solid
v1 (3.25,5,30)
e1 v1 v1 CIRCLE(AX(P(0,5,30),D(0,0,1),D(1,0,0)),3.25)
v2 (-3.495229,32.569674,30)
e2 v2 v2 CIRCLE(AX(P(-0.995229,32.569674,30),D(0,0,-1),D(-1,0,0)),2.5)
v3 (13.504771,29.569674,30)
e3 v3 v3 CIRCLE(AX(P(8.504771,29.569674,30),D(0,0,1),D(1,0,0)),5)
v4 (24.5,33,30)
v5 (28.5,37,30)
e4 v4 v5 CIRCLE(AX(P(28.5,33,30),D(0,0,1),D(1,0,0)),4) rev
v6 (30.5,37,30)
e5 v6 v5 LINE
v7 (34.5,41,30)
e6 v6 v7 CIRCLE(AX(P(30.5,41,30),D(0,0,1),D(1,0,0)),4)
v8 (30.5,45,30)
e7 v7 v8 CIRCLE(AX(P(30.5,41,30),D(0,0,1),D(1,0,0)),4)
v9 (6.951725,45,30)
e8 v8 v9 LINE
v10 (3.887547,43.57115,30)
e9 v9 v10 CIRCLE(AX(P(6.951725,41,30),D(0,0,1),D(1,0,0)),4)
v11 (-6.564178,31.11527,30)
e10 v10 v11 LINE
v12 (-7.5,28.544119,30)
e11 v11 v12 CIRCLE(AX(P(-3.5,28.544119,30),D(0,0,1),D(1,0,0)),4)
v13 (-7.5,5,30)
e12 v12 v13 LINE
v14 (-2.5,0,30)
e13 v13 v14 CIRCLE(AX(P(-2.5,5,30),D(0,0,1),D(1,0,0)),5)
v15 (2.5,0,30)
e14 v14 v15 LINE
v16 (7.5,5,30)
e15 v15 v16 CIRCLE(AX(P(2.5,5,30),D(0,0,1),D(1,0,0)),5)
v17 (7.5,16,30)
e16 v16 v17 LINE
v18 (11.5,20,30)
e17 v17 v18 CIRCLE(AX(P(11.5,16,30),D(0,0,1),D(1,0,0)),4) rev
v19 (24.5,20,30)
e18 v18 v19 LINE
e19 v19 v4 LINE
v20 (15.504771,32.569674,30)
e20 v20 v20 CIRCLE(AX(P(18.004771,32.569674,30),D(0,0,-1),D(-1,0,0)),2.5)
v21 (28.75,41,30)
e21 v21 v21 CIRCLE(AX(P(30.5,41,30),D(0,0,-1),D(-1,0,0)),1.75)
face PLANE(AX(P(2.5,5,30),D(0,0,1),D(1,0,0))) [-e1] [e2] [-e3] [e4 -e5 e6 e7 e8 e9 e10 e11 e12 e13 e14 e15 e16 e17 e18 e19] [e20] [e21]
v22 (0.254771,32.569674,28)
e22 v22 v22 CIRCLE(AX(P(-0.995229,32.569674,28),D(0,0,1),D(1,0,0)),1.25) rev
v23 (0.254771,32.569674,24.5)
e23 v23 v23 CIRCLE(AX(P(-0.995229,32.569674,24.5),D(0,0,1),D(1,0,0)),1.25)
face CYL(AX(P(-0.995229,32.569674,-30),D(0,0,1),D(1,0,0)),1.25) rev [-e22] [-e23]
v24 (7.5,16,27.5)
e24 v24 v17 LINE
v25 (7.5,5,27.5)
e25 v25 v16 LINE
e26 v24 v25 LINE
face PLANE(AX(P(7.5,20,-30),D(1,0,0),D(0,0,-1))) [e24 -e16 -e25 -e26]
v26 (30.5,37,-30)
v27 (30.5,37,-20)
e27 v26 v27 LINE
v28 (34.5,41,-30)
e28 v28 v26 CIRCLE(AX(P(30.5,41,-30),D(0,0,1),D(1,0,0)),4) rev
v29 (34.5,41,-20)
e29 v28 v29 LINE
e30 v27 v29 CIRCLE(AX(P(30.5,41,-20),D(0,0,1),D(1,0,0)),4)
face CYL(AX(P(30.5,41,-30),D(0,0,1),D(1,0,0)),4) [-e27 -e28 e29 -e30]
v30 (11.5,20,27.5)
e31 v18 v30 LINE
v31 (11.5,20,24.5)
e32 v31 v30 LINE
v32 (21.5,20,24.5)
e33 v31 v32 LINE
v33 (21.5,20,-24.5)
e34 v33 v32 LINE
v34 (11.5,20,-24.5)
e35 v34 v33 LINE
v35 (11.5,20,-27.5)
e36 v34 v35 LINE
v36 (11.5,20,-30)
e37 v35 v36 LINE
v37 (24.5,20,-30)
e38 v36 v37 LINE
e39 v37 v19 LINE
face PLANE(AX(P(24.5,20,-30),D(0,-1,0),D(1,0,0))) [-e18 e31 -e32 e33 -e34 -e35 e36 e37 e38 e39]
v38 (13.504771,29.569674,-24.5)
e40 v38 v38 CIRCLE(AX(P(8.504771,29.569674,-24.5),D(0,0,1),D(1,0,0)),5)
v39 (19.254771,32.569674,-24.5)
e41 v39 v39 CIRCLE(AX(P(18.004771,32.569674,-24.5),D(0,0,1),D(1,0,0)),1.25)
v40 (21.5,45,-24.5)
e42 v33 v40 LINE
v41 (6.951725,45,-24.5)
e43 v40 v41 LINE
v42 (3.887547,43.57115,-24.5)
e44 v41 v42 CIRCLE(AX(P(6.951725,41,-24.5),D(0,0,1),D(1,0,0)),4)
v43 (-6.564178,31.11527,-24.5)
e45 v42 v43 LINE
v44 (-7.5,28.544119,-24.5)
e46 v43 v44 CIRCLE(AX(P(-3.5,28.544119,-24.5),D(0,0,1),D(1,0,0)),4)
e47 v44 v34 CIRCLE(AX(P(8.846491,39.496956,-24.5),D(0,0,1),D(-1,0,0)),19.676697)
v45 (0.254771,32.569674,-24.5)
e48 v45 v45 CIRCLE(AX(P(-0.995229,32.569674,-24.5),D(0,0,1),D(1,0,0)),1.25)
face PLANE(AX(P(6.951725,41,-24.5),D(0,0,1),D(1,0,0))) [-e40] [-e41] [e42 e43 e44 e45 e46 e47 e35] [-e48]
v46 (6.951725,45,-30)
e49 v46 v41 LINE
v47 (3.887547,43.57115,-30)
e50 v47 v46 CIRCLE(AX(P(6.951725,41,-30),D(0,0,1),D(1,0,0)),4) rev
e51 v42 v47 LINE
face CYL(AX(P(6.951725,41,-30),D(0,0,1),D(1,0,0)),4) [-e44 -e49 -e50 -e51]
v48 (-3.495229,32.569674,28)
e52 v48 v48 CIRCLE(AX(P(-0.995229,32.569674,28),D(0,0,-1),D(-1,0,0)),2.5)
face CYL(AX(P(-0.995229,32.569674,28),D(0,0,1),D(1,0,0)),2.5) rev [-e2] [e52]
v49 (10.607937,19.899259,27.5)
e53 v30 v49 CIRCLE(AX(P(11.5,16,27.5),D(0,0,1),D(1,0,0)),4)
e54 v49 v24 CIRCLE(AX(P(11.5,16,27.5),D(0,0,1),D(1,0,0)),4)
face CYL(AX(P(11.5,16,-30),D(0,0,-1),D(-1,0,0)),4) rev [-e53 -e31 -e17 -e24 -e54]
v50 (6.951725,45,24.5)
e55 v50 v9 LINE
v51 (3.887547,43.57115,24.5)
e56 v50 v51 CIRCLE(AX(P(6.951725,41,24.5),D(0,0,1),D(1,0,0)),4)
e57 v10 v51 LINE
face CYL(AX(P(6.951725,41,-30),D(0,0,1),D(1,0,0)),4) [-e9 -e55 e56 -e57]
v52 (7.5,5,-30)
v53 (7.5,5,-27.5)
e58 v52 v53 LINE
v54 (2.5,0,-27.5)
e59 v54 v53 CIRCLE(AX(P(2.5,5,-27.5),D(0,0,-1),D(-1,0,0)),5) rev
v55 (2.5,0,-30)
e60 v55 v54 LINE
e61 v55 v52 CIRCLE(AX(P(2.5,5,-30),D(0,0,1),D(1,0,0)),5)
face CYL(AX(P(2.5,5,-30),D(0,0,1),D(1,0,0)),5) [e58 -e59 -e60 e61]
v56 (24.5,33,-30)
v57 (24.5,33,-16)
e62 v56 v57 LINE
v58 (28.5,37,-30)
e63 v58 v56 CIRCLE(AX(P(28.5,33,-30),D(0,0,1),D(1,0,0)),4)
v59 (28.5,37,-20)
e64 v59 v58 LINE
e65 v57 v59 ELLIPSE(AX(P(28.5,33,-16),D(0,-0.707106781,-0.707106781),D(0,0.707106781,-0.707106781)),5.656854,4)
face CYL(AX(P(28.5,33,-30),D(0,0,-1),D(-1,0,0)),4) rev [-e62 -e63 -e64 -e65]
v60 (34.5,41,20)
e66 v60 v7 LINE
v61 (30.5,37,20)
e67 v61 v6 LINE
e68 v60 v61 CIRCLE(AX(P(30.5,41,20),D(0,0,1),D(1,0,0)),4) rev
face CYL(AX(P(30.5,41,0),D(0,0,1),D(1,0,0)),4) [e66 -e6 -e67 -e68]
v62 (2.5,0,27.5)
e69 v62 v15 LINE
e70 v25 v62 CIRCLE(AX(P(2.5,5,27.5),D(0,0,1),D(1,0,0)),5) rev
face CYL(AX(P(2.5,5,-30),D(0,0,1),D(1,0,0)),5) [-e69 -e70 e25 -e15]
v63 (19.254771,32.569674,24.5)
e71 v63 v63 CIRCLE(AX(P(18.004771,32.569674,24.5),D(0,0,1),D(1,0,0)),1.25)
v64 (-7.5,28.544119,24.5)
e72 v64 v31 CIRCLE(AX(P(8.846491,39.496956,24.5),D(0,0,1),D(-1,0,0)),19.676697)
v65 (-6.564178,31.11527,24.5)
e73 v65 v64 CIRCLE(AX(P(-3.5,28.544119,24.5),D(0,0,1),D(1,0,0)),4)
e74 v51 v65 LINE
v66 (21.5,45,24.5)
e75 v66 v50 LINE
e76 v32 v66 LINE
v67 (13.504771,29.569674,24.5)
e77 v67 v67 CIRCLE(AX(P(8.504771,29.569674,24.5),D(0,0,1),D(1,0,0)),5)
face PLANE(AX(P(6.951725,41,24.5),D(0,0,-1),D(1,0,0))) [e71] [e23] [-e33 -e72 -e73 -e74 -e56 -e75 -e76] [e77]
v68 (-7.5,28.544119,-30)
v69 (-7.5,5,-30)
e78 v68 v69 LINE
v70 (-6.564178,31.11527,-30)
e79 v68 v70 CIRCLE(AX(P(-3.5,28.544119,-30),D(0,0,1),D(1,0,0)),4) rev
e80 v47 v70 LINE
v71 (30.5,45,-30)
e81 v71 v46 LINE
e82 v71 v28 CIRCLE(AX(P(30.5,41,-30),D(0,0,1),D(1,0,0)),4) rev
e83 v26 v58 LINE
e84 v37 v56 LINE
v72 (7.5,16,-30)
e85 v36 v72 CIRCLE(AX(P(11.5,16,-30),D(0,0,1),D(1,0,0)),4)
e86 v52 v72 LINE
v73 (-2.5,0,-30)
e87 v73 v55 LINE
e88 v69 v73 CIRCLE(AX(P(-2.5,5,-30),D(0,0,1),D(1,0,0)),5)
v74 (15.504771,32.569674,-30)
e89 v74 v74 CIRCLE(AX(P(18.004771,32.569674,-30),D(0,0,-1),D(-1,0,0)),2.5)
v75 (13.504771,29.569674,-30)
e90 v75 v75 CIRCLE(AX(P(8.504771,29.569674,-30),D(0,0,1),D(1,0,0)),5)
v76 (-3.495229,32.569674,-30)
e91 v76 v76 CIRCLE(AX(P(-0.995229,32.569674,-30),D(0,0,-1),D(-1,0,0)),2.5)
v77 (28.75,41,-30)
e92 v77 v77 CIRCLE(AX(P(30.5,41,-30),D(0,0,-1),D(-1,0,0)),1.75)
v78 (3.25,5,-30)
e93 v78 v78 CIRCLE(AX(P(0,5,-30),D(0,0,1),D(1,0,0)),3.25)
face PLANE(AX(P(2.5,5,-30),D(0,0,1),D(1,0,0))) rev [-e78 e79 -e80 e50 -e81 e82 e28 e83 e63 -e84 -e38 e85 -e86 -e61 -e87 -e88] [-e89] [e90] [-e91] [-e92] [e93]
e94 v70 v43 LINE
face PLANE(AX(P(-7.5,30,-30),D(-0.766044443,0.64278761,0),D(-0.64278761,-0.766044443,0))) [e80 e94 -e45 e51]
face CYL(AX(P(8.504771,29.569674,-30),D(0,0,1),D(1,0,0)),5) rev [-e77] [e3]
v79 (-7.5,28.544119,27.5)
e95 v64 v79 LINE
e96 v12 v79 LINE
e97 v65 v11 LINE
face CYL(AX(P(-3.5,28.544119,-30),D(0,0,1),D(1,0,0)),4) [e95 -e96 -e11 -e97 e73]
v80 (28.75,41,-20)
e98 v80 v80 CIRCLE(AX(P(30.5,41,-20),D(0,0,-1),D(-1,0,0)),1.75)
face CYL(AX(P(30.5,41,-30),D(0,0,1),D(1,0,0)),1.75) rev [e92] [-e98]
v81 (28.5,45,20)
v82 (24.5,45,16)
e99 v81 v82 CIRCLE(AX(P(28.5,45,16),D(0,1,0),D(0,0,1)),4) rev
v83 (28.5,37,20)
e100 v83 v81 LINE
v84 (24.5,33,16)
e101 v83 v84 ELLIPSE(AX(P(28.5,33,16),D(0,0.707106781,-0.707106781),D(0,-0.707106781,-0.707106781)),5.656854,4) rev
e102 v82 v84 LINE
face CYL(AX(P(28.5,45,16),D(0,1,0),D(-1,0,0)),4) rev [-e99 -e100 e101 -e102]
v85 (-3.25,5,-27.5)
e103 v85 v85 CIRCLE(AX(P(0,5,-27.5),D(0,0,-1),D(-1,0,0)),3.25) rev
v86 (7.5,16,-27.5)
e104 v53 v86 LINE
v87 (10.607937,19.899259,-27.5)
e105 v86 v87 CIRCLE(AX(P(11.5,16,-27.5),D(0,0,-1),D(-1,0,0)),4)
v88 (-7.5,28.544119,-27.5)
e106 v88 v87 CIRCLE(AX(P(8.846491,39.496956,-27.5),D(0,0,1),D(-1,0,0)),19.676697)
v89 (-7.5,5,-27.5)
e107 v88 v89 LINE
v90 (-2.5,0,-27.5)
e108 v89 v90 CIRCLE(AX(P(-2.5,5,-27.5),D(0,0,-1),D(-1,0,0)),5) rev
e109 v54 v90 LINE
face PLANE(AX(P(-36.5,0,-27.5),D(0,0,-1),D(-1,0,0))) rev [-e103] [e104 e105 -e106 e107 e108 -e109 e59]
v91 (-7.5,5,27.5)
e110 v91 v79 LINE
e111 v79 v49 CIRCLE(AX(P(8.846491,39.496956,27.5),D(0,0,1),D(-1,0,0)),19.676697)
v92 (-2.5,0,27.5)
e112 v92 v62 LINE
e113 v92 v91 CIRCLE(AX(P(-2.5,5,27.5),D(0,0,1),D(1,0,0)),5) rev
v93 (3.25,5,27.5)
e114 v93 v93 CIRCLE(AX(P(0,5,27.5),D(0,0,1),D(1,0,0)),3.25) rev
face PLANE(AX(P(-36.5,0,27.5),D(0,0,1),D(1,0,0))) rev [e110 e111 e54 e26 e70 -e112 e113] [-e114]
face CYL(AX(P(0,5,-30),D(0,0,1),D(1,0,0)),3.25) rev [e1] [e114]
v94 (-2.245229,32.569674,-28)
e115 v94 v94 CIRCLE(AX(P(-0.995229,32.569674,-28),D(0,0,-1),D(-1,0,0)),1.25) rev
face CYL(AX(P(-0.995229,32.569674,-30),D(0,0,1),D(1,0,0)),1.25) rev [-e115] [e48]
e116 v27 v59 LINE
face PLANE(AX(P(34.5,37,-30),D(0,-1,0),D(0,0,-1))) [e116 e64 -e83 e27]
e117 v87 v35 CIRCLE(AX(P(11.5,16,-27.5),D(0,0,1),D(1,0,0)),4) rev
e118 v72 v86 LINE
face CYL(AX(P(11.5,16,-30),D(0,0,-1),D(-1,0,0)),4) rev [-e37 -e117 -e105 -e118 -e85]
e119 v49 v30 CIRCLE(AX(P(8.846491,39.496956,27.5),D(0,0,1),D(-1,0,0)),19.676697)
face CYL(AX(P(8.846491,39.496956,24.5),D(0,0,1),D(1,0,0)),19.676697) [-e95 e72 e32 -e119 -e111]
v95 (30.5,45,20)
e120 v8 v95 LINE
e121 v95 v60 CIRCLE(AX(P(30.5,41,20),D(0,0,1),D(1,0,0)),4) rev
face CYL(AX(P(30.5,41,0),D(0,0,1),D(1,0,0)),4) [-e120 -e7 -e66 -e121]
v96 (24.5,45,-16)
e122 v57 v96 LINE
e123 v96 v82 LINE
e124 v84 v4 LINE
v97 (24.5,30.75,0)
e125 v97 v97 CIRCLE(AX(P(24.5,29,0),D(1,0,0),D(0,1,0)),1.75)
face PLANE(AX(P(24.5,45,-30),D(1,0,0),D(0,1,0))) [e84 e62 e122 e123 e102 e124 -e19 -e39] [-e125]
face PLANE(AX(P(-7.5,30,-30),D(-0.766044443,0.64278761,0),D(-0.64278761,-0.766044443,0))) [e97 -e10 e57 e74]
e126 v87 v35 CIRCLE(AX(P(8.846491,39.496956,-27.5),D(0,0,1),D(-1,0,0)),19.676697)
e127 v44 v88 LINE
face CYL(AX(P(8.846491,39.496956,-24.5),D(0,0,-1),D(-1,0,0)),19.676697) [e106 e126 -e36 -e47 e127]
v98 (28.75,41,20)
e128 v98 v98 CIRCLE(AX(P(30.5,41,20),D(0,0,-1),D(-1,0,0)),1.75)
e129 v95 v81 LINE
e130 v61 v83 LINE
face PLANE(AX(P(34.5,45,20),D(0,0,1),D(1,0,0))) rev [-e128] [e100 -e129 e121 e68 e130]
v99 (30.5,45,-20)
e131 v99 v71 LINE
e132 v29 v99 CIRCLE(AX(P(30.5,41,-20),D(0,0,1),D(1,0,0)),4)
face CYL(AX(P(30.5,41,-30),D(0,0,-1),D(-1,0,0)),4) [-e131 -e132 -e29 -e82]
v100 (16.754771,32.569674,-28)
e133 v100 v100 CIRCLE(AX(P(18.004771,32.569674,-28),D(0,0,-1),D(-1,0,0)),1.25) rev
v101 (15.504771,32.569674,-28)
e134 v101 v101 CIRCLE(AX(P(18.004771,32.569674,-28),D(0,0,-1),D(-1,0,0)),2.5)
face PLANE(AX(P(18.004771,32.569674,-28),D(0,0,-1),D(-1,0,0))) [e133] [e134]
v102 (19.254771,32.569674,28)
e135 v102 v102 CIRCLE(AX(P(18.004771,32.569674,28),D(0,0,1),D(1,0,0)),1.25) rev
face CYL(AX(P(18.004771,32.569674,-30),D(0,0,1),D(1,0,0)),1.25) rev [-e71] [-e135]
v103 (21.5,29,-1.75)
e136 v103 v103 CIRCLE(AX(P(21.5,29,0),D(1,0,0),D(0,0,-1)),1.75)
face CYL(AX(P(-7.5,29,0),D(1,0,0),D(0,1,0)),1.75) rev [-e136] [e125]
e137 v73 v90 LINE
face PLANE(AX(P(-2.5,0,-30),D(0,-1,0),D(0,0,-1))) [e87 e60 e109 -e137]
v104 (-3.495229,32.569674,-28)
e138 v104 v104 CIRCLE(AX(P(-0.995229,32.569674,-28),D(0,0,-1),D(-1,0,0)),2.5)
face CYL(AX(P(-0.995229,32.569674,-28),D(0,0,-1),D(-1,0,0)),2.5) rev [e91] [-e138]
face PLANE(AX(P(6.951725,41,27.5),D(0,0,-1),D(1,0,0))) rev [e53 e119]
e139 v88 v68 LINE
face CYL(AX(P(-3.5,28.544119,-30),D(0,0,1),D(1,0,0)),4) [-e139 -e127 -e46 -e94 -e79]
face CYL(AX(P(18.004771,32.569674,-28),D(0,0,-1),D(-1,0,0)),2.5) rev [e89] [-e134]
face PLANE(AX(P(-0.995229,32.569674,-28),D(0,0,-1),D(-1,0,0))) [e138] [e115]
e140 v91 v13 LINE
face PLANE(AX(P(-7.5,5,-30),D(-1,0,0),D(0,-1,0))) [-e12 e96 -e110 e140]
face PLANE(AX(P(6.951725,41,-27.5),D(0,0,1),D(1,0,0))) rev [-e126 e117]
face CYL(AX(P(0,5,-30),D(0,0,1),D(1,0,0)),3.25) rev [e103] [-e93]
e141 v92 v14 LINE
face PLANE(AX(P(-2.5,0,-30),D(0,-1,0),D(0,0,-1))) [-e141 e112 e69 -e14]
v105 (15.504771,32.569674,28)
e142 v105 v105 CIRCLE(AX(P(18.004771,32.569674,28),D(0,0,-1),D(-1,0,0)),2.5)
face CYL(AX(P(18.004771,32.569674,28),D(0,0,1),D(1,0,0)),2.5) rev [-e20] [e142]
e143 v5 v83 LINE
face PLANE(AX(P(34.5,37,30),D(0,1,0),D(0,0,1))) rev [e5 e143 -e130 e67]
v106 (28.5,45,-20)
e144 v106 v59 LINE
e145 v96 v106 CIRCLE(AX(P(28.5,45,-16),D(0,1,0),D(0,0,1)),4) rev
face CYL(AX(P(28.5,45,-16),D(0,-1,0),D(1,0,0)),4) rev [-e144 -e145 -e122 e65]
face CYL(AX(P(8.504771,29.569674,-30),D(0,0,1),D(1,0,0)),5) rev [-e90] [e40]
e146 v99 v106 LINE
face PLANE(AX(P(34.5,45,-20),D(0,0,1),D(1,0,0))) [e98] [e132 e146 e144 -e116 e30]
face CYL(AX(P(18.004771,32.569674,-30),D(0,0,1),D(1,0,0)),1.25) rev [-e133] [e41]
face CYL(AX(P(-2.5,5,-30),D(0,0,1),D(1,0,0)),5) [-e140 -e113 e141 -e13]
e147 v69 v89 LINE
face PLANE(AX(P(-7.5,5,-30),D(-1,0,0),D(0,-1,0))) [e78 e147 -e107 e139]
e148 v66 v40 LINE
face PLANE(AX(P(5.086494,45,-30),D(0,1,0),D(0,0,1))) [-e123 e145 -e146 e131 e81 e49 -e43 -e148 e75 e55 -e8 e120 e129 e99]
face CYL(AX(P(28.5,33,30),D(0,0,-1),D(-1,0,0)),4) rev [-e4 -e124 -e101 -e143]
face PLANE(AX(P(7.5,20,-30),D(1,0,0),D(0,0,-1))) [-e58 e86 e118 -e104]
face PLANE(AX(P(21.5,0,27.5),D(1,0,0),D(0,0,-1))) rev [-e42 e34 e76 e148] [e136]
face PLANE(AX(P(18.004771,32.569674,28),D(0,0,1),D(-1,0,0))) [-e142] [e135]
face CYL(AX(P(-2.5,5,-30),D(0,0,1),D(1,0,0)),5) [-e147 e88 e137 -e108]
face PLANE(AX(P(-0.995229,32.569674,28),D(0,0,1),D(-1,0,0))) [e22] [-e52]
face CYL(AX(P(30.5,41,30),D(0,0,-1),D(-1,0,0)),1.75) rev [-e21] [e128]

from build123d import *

# Parameters (mm, degrees)
BOSS_EXTRUDE1_DEPTH      = 30
BOSS_EXTRUDE1_DEPTH_BACK = 30
SKETCH2_R                = 3.25
SKETCH2_R_2              = 1.25
SKETCH2_R_3              = 5
SKETCH3_W                = 58
SKETCH3_H                = 55
CUT_EXTRUDE1_DEPTH       = 60.373815778
SKETCH4_W                = 10
SKETCH4_H                = 8
BOSS_EXTRUDE2_DEPTH      = 10
FILLET1_R                = 4
SKETCH5_R                = 1.75
CUT_EXTRUDE2_DEPTH       = 76.599272483
FILLET1_OF_MIRROR1_R     = 4
FILLET2_R                = 4
SKETCH6_R                = 1.25
SKETCH6_R_2              = 5
BOSS_EXTRUDE3_DEPTH      = 3
SKETCH7_R                = 2.5
CUT_EXTRUDE3_DEPTH       = 2
SKETCH8_R                = 1.75
CUT_EXTRUDE4_DEPTH       = 63.841069373


with BuildPart() as part:
    # Sketch2 → Boss-Extrude1 (new, two sides: drawn at the far end of the back side and taken through both)
    with BuildSketch(Plane.XY.offset(-BOSS_EXTRUDE1_DEPTH_BACK)):
        with BuildLine():
            Line((-7.5, 5), (-7.5, 30))
            Line((-7.5, 30), (5.086494468, 45))
            Line((5.086494468, 45), (24.5, 45))
            Line((24.5, 45), (24.5, 20))
            Line((24.5, 20), (7.5, 20))
            Line((7.5, 20), (7.5, 5))
            ThreePointArc((7.5, 5), (6.035533906, 1.464466094), (2.5, 0))
            Line((2.5, 0), (-2.5, 0))
            ThreePointArc((-2.5, 0), (-6.035533906, 1.464466094), (-7.5, 5))
        make_face()
        with Locations((0, 5)):
            Circle(SKETCH2_R, mode=Mode.SUBTRACT)
        with Locations((18.004770913, 32.569673822)):
            Circle(SKETCH2_R_2, mode=Mode.SUBTRACT)
        with Locations((-0.995229087, 32.569673822)):
            Circle(SKETCH2_R_2, mode=Mode.SUBTRACT)
        with Locations((8.504770913, 29.569673822)):
            Circle(SKETCH2_R_3, mode=Mode.SUBTRACT)
    extrude(amount=BOSS_EXTRUDE1_DEPTH + BOSS_EXTRUDE1_DEPTH_BACK)

    # Sketch3 → Cut-Extrude1 (cut, through all)
    with BuildSketch(Plane(origin=(0, 45, 0), x_dir=(1, 0, 0), z_dir=(0, 1, 0))):
        with Locations((-7.5, 0)):
            Rectangle(SKETCH3_W, SKETCH3_H)
    extrude(amount=-CUT_EXTRUDE1_DEPTH, mode=Mode.SUBTRACT)

    # Sketch4 → Boss-Extrude2 (add)
    with BuildSketch(Plane(origin=(24.5, 0, 0), x_dir=(0, 0, -1), z_dir=(1, 0, 0))):
        with Locations((-25, 41)):
            Rectangle(SKETCH4_W, SKETCH4_H)
    boss_extrude2 = extrude(amount=BOSS_EXTRUDE2_DEPTH)

    # Fillet1
    fillet1_edges = [part.edges().sort_by_distance(p)[0] for p in [
        (34.5, 37, 25),
        (34.5, 45, 25),
    ]]
    fillet(fillet1_edges, radius=FILLET1_R - 0.0001)  # a hair under: the kernel refuses the full size

    # Sketch5 → Cut-Extrude2 (cut, through all)
    with BuildSketch(Plane(origin=(0, 0, 20), x_dir=(-1, 0, 0), z_dir=(0, 0, -1))):
        with Locations((-30.5, 41)):
            Circle(SKETCH5_R)
    cut_extrude2 = extrude(amount=-CUT_EXTRUDE2_DEPTH, mode=Mode.SUBTRACT)

    # Mirror1: Boss-Extrude2, Cut-Extrude2 across plane
    add(boss_extrude2.mirror(Plane.XY))
    add(cut_extrude2.mirror(Plane.XY), mode=Mode.SUBTRACT)

    # Fillet1 of Mirror1
    fillet1_of_mirror1_edges = [part.edges().sort_by_distance(p)[0] for p in [
        (34.5, 37, -25),
        (34.5, 45, -25),
    ]]
    fillet(fillet1_of_mirror1_edges, radius=FILLET1_OF_MIRROR1_R - 0.0001)  # a hair under: the kernel refuses the full size

    # Fillet2
    fillet2_edges = [part.edges().sort_by_distance(p)[0] for p in [
        (24.5, 37, 25),
        (24.5, 41, 20),
        (24.5, 37, -25),
        (24.5, 41, -20),
        (5.086494468, 45, -28.75),
        (7.5, 20, -28.75),
        (-7.5, 30, -28.75),
        (-7.5, 30, 28.75),
        (7.5, 20, 28.75),
        (5.086494468, 45, 28.75),
    ]]
    fillet(fillet2_edges, radius=FILLET2_R)

    # Sketch6 → Boss-Extrude3 (add)
    with BuildSketch(Plane.XY.offset(-27.5)):
        with BuildLine():
            Line((21.5, 45), (6.9517251, 45))
            ThreePointArc((6.9517251, 45), (5.261252053, 44.625231148), (3.887547328, 43.571150439))
            Line((3.887547328, 43.571150439), (-6.564177772, 31.115269502))
            ThreePointArc((-6.564177772, 31.115269502), (-7.258770483, 29.912199636), (-7.5, 28.544119063))
            ThreePointArc((-7.5, 28.544119063), (0.776489044, 21.551274863), (11.5, 20))
            Line((11.5, 20), (21.5, 20))
            Line((21.5, 20), (21.5, 45))
        make_face()
        with Locations((18.004770913, 32.569673822)):
            Circle(SKETCH6_R, mode=Mode.SUBTRACT)
        with Locations((8.504770913, 29.569673822)):
            Circle(SKETCH6_R_2, mode=Mode.SUBTRACT)
        with Locations((-0.995229087, 32.569673822)):
            Circle(SKETCH6_R, mode=Mode.SUBTRACT)
    boss_extrude3 = extrude(amount=BOSS_EXTRUDE3_DEPTH)

    # Sketch7 → Cut-Extrude3 (cut)
    with BuildSketch(Plane(origin=(0, 0, -30), x_dir=(-1, 0, 0), z_dir=(0, 0, -1))):
        with Locations((-18.004770913, 32.569673822)):
            Circle(SKETCH7_R)
        with Locations((0.995229087, 32.569673822)):
            Circle(SKETCH7_R)
    cut_extrude3 = extrude(amount=-CUT_EXTRUDE3_DEPTH, mode=Mode.SUBTRACT)

    # Mirror2: Boss-Extrude3, Cut-Extrude3 across plane
    add(boss_extrude3.mirror(Plane.XY))
    add(cut_extrude3.mirror(Plane.XY), mode=Mode.SUBTRACT)

    # Sketch8 → Cut-Extrude4 (cut, through all)
    with BuildSketch(Plane(origin=(24.5, 0, 0), x_dir=(0, 0, -1), z_dir=(1, 0, 0))):
        with Locations(Location((0, 29, 0), (0, 0, 90))):
            Circle(SKETCH8_R)
    extrude(amount=-CUT_EXTRUDE4_DEPTH, mode=Mode.SUBTRACT)


solid = part.part
